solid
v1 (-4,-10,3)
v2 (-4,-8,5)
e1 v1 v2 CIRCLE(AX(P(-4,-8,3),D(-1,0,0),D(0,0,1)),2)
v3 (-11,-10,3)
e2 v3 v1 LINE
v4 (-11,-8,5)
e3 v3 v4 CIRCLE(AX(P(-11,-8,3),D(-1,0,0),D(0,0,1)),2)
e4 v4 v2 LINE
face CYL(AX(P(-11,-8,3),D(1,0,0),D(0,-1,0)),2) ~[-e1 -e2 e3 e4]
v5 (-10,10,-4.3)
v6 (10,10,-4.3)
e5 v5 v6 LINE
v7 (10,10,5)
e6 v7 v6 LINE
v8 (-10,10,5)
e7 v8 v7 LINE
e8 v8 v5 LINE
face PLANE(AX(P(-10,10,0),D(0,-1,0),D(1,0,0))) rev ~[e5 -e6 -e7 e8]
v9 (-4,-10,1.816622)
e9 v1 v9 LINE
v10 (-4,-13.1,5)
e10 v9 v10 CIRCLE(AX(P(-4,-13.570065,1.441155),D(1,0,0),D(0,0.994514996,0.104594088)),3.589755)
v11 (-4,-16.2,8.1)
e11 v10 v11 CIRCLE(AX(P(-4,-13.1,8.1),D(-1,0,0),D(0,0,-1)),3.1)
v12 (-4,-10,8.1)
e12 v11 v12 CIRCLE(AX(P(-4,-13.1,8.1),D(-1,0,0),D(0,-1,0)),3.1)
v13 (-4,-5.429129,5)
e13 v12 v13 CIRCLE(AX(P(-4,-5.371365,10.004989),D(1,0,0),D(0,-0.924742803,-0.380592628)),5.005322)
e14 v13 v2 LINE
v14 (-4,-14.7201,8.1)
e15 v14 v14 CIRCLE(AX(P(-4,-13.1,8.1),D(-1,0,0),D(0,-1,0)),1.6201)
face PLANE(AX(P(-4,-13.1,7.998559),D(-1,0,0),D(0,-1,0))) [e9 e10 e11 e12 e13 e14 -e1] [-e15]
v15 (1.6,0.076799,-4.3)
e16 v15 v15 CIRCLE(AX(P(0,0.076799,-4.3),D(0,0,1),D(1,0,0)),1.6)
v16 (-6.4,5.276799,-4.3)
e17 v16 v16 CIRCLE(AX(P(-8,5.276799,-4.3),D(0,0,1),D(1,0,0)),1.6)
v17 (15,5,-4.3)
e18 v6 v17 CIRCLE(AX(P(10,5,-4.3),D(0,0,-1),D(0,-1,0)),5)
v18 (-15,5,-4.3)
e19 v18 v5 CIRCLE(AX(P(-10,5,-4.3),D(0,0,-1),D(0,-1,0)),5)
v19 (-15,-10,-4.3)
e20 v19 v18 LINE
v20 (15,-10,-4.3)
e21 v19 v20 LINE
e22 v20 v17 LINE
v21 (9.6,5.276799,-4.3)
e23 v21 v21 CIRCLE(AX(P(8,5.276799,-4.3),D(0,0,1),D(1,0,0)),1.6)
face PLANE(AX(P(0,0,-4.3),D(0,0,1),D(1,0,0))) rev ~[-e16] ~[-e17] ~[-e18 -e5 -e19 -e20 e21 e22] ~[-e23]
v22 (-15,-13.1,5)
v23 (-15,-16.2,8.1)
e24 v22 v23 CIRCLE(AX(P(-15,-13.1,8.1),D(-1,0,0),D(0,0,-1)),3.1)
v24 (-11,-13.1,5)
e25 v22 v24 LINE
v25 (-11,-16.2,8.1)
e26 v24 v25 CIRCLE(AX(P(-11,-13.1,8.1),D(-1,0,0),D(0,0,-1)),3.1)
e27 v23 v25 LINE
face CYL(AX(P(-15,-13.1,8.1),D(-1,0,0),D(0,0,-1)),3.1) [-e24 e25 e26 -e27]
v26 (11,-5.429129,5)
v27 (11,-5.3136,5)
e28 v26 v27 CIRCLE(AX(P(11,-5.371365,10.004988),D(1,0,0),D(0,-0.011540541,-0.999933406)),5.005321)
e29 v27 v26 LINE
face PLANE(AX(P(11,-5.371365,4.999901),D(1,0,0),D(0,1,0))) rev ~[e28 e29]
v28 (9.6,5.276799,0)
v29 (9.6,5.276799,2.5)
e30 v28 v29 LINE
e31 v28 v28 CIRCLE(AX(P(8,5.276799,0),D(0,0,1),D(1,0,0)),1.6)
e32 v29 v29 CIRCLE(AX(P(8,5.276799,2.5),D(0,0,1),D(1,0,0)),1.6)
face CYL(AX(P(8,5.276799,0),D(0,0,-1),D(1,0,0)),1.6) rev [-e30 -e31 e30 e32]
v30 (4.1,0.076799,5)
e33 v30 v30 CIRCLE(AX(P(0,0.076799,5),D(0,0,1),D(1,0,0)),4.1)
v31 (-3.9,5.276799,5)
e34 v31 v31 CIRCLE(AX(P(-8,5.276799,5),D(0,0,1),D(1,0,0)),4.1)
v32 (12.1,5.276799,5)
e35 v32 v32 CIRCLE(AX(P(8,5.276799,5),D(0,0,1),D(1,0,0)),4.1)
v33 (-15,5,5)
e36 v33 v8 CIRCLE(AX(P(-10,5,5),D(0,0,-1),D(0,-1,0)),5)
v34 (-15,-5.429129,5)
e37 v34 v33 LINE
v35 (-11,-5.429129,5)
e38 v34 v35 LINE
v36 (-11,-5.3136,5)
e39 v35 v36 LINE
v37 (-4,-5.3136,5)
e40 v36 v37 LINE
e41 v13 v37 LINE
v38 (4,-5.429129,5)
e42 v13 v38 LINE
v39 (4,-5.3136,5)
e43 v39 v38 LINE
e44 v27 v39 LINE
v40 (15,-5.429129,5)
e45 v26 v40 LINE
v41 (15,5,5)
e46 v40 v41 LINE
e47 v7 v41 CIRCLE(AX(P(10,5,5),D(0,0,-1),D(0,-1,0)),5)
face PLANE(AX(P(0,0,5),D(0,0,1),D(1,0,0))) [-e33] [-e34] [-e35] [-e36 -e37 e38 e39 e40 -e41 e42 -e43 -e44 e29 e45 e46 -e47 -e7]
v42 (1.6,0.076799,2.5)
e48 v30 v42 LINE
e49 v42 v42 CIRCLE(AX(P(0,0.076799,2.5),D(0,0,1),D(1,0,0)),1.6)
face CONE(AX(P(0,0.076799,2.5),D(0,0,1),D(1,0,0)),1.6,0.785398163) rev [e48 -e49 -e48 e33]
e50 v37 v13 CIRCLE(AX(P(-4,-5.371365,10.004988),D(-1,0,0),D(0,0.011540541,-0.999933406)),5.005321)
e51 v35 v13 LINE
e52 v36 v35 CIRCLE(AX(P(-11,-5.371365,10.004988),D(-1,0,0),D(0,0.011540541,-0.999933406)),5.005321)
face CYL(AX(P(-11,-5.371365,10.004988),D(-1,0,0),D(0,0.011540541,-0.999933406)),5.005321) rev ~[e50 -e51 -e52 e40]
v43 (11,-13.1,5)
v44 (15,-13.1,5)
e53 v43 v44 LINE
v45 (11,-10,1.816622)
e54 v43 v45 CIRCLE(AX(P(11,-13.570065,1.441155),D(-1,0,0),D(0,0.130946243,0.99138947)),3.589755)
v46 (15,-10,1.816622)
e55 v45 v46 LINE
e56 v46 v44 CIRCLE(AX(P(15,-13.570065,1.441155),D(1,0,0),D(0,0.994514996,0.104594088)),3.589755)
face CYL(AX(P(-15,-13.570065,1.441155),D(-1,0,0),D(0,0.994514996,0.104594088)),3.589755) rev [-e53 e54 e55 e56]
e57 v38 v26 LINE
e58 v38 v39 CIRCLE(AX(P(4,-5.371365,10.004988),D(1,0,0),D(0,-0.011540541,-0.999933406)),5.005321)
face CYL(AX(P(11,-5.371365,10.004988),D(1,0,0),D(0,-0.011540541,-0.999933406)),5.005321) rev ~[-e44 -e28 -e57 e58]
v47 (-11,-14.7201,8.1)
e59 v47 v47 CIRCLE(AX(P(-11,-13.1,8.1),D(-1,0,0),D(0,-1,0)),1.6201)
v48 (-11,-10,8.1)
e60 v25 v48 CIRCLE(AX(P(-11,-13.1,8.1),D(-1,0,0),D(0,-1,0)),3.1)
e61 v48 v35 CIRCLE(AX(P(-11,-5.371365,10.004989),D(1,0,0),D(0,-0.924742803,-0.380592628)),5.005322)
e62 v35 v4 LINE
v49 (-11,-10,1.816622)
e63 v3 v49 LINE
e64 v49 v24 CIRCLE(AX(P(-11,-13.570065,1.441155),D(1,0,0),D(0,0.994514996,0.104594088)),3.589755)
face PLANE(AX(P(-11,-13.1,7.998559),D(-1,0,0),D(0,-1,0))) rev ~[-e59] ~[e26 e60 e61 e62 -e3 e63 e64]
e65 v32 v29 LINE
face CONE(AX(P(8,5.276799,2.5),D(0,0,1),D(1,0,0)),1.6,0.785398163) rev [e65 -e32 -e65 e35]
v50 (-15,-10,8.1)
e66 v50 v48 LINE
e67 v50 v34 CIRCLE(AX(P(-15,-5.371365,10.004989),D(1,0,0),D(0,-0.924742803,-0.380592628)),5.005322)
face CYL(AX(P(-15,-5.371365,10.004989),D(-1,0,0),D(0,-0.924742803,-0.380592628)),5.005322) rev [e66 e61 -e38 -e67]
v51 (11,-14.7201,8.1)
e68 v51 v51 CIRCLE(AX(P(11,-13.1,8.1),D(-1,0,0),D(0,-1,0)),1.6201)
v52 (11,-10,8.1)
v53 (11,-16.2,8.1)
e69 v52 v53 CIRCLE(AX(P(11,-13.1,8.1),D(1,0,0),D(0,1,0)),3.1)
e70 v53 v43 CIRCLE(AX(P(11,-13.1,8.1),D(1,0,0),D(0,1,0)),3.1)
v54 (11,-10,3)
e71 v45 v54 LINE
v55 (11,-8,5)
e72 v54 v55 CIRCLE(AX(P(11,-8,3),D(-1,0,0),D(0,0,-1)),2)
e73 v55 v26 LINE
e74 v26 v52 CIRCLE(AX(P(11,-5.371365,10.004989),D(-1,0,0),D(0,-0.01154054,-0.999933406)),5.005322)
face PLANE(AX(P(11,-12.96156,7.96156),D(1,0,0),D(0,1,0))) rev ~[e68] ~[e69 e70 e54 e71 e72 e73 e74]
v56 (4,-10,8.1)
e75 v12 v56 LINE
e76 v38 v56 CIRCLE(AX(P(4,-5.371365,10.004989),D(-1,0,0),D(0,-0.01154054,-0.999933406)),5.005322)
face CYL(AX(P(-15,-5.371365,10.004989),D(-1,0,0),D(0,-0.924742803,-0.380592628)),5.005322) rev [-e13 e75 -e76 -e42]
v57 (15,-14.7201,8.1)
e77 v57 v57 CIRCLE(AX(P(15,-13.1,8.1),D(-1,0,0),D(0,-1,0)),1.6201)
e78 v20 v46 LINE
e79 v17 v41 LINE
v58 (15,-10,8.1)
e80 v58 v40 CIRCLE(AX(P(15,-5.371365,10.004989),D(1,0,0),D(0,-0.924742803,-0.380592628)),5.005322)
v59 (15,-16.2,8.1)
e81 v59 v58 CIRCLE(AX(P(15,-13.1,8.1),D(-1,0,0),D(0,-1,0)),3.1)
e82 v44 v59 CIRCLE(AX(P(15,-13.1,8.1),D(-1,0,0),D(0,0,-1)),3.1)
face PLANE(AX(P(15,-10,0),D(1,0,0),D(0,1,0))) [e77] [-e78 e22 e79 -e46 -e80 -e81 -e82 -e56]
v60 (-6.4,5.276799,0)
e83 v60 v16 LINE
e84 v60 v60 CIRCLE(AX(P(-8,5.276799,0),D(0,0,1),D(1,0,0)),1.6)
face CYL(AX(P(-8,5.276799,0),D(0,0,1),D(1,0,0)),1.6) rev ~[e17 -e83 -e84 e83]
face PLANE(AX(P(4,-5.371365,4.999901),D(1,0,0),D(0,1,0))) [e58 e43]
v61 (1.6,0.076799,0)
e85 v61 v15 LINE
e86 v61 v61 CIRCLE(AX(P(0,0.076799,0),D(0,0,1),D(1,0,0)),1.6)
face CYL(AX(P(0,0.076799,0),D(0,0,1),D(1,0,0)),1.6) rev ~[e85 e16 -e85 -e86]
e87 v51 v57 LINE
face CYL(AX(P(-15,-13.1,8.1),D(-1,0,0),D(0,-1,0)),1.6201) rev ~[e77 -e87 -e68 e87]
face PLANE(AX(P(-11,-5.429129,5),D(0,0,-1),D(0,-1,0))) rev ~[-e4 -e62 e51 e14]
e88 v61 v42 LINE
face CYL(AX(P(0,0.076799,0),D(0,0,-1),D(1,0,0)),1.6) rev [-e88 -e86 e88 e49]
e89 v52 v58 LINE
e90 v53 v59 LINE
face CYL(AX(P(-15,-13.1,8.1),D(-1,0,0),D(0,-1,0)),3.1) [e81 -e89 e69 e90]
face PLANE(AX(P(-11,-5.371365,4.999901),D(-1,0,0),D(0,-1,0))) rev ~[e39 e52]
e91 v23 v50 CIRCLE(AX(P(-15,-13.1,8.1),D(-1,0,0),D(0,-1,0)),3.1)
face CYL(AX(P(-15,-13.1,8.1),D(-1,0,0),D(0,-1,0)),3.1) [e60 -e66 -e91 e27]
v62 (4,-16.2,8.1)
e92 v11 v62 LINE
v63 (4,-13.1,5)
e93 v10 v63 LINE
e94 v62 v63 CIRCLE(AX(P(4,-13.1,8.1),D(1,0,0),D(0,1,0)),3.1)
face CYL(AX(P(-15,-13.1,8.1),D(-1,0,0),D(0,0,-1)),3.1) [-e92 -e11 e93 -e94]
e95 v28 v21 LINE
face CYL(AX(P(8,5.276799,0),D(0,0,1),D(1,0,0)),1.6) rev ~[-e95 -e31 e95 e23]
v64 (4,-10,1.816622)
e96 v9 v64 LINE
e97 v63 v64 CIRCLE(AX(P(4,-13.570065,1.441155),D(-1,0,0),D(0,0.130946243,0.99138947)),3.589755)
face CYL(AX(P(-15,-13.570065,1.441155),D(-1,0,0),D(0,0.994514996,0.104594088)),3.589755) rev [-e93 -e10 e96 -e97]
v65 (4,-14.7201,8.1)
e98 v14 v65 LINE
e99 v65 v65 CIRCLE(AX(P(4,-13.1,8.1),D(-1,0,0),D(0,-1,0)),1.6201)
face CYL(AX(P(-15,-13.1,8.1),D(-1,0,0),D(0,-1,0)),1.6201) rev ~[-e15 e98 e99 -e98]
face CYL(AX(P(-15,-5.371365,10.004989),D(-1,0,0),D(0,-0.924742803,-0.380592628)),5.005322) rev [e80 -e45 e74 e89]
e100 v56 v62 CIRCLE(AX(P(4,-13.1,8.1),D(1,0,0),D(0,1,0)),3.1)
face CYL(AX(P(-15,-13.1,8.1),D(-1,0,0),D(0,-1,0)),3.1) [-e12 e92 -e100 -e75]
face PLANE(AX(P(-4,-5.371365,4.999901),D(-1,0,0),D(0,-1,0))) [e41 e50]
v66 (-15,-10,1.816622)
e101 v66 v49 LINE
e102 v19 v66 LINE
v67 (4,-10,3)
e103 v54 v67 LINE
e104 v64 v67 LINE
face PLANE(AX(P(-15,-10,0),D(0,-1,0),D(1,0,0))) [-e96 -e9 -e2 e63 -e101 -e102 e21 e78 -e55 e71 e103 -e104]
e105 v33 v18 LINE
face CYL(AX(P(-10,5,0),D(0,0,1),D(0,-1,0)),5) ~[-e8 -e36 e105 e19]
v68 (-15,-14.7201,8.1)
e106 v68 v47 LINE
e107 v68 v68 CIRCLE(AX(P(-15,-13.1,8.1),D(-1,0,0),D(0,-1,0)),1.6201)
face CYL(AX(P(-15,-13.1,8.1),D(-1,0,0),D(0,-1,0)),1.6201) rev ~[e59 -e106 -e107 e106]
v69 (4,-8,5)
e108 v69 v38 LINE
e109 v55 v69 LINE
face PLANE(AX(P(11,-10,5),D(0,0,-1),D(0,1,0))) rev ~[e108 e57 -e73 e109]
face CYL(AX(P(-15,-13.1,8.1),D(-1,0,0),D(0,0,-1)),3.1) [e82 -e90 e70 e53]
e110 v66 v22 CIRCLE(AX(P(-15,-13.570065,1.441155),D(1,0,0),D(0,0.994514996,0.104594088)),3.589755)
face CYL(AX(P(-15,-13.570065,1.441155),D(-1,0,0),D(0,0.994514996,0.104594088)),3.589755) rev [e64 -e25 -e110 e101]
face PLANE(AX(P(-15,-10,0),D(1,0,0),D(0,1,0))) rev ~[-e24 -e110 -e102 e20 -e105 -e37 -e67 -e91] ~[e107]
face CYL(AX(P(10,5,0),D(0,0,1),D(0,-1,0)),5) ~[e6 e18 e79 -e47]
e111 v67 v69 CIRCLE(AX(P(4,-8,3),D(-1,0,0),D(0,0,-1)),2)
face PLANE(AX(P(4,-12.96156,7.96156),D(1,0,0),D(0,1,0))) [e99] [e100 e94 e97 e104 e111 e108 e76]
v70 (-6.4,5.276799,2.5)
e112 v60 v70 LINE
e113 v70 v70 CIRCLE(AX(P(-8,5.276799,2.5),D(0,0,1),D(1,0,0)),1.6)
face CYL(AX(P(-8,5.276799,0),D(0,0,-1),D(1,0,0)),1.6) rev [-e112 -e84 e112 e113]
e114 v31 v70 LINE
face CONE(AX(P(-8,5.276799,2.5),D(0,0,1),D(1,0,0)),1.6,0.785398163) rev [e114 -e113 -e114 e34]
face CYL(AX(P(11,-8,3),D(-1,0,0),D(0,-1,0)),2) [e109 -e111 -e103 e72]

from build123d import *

# Parameters (mm, degrees)
F0_W      = 30
F0_H      = 20
F0_R      = 1.6
F1_DEPTH  = 5
F3_DEPTH  = 30
F7_DEPTH  = 7
F9_DEPTH  = 7
F10_SIZE  = 2.5
F11_R     = 5
F12_R     = 1.6200998357
F13_DEPTH = 30.001
F14_R     = 2
F15_DEPTH = 4.3


with BuildPart() as f1:
    # F0 (on Top) → F1 (new body)
    with BuildSketch(Plane.XY):
        Rectangle(F0_W, F0_H)
        with Locations((-8, 5.2767994255)):
            Circle(F0_R, mode=Mode.SUBTRACT)
        with Locations((0, 0.0767994255)):
            Circle(F0_R, mode=Mode.SUBTRACT)
        with Locations((8, 5.2767994255)):
            Circle(F0_R, mode=Mode.SUBTRACT)
    extrude(amount=F1_DEPTH)

    # F2 (on face) → F3 (join, through all)
    with BuildSketch(Plane(origin=(-15, 0, 0), x_dir=(0, -1, 0), z_dir=(-1, 0, 0))):
        with BuildLine():
            ThreePointArc((13.1, 5), (15.2920310217, 5.9079689783), (16.2, 8.1))
            ThreePointArc((16.2, 8.1), (13.1, 11.2), (10, 8.1))
            ThreePointArc((10, 8.1), (10.9079689783, 5.9079689783), (13.1, 5))
        make_face()
        with BuildLine():
            ThreePointArc((13.1, 5), (10.9079689783, 5.9079689783), (10, 8.1))
            ThreePointArc((10, 8.1), (8.1808280522, 5.8625059643), (5.4291286506, 5))
            Line((5.4291286506, 5), (10, 5))
            Line((10, 5), (10, 1.816622098))
            ThreePointArc((10, 1.816622098), (10.998268655, 3.9455916428), (13.1, 5))
        make_face()
    extrude(amount=-F3_DEPTH)

    # F6 (on offset) → F7 (cut)
    with BuildSketch(Plane.YZ.offset(11)):
        with BuildLine():
            ThreePointArc((-13.1, 5), (-10.9079689783, 5.9079689783), (-10, 8.1))
            ThreePointArc((-10, 8.1), (-15.2920310217, 10.2920310217), (-13.1, 5))
        make_face()
        with BuildLine():
            ThreePointArc((-5.4291286506, 5), (-8.1808280522, 5.8625059643), (-10, 8.1))
            ThreePointArc((-10, 8.1), (-10.9079689783, 5.9079689783), (-13.1, 5))
            ThreePointArc((-13.1, 5), (-10.998268655, 3.9455916428), (-10, 1.816622098))
            Line((-10, 1.816622098), (-10, 5))
            Line((-10, 5), (-5.4291286506, 5))
        make_face()
        with BuildLine():
            Line((-5.3136004135, 5), (-5.4291286506, 5))
            ThreePointArc((-5.4291286506, 5), (-5.371364532, 4.9996666743), (-5.3136004135, 5))
        make_face()
    extrude(amount=-F7_DEPTH, mode=Mode.SUBTRACT)

    # F8 (on offset) → F9 (cut)
    with BuildSketch(Plane(origin=(-11, 0, 0), x_dir=(0, -1, 0), z_dir=(-1, 0, 0))):
        with BuildLine():
            ThreePointArc((13.1, 5), (15.2920310217, 5.9079689783), (16.2, 8.1))
            ThreePointArc((16.2, 8.1), (13.1, 11.2), (10, 8.1))
            ThreePointArc((10, 8.1), (10.9079689783, 5.9079689783), (13.1, 5))
        make_face()
        with BuildLine():
            ThreePointArc((5.3136004135, 5), (5.371364532, 4.9996666743), (5.4291286506, 5))
            Line((5.4291286506, 5), (5.3136004135, 5))
        make_face()
        with BuildLine():
            ThreePointArc((13.1, 5), (10.9079689783, 5.9079689783), (10, 8.1))
            ThreePointArc((10, 8.1), (8.1808280522, 5.8625059643), (5.4291286506, 5))
            Line((5.4291286506, 5), (10, 5))
            Line((10, 5), (10, 1.816622098))
            ThreePointArc((10, 1.816622098), (10.998268655, 3.9455916428), (13.1, 5))
        make_face()
    extrude(amount=-F9_DEPTH, mode=Mode.SUBTRACT)

    # F10
    f10_edges = [f1.edges().sort_by_distance(p)[0] for p in [
        (-9.6, 5.276799, 5),
        (-1.6, 0.076799, 5),
        (6.4, 5.276799, 5),
    ]]
    chamfer(f10_edges, length=F10_SIZE)

    # F11
    f11_edges = [f1.edges().sort_by_distance(p)[0] for p in [
        (-15, 10, 2.5),
        (15, 10, 2.5),
    ]]
    fillet(f11_edges, radius=F11_R)

    # F12 (on face) → F13 (cut, through all)
    with BuildSketch(Plane(origin=(-15, 0, 0), x_dir=(0, -1, 0), z_dir=(-1, 0, 0))):
        with Locations((13.1, 8.1)):
            Circle(F12_R)
    extrude(amount=-F13_DEPTH, mode=Mode.SUBTRACT)

    # F14
    f14_edges = [f1.edges().sort_by_distance(p)[0] for p in [
        (-7.5, -10, 5),
        (7.5, -10, 5),
    ]]
    fillet(f14_edges, radius=F14_R)

    # F15 (add): a face of the model
    f15_faces = [f1.faces().sort_by_distance(p)[0] for p in [
        (14.6394448725, -2.5, 0),
    ]]
    extrude(f15_faces, amount=F15_DEPTH)


solid = f1.part
